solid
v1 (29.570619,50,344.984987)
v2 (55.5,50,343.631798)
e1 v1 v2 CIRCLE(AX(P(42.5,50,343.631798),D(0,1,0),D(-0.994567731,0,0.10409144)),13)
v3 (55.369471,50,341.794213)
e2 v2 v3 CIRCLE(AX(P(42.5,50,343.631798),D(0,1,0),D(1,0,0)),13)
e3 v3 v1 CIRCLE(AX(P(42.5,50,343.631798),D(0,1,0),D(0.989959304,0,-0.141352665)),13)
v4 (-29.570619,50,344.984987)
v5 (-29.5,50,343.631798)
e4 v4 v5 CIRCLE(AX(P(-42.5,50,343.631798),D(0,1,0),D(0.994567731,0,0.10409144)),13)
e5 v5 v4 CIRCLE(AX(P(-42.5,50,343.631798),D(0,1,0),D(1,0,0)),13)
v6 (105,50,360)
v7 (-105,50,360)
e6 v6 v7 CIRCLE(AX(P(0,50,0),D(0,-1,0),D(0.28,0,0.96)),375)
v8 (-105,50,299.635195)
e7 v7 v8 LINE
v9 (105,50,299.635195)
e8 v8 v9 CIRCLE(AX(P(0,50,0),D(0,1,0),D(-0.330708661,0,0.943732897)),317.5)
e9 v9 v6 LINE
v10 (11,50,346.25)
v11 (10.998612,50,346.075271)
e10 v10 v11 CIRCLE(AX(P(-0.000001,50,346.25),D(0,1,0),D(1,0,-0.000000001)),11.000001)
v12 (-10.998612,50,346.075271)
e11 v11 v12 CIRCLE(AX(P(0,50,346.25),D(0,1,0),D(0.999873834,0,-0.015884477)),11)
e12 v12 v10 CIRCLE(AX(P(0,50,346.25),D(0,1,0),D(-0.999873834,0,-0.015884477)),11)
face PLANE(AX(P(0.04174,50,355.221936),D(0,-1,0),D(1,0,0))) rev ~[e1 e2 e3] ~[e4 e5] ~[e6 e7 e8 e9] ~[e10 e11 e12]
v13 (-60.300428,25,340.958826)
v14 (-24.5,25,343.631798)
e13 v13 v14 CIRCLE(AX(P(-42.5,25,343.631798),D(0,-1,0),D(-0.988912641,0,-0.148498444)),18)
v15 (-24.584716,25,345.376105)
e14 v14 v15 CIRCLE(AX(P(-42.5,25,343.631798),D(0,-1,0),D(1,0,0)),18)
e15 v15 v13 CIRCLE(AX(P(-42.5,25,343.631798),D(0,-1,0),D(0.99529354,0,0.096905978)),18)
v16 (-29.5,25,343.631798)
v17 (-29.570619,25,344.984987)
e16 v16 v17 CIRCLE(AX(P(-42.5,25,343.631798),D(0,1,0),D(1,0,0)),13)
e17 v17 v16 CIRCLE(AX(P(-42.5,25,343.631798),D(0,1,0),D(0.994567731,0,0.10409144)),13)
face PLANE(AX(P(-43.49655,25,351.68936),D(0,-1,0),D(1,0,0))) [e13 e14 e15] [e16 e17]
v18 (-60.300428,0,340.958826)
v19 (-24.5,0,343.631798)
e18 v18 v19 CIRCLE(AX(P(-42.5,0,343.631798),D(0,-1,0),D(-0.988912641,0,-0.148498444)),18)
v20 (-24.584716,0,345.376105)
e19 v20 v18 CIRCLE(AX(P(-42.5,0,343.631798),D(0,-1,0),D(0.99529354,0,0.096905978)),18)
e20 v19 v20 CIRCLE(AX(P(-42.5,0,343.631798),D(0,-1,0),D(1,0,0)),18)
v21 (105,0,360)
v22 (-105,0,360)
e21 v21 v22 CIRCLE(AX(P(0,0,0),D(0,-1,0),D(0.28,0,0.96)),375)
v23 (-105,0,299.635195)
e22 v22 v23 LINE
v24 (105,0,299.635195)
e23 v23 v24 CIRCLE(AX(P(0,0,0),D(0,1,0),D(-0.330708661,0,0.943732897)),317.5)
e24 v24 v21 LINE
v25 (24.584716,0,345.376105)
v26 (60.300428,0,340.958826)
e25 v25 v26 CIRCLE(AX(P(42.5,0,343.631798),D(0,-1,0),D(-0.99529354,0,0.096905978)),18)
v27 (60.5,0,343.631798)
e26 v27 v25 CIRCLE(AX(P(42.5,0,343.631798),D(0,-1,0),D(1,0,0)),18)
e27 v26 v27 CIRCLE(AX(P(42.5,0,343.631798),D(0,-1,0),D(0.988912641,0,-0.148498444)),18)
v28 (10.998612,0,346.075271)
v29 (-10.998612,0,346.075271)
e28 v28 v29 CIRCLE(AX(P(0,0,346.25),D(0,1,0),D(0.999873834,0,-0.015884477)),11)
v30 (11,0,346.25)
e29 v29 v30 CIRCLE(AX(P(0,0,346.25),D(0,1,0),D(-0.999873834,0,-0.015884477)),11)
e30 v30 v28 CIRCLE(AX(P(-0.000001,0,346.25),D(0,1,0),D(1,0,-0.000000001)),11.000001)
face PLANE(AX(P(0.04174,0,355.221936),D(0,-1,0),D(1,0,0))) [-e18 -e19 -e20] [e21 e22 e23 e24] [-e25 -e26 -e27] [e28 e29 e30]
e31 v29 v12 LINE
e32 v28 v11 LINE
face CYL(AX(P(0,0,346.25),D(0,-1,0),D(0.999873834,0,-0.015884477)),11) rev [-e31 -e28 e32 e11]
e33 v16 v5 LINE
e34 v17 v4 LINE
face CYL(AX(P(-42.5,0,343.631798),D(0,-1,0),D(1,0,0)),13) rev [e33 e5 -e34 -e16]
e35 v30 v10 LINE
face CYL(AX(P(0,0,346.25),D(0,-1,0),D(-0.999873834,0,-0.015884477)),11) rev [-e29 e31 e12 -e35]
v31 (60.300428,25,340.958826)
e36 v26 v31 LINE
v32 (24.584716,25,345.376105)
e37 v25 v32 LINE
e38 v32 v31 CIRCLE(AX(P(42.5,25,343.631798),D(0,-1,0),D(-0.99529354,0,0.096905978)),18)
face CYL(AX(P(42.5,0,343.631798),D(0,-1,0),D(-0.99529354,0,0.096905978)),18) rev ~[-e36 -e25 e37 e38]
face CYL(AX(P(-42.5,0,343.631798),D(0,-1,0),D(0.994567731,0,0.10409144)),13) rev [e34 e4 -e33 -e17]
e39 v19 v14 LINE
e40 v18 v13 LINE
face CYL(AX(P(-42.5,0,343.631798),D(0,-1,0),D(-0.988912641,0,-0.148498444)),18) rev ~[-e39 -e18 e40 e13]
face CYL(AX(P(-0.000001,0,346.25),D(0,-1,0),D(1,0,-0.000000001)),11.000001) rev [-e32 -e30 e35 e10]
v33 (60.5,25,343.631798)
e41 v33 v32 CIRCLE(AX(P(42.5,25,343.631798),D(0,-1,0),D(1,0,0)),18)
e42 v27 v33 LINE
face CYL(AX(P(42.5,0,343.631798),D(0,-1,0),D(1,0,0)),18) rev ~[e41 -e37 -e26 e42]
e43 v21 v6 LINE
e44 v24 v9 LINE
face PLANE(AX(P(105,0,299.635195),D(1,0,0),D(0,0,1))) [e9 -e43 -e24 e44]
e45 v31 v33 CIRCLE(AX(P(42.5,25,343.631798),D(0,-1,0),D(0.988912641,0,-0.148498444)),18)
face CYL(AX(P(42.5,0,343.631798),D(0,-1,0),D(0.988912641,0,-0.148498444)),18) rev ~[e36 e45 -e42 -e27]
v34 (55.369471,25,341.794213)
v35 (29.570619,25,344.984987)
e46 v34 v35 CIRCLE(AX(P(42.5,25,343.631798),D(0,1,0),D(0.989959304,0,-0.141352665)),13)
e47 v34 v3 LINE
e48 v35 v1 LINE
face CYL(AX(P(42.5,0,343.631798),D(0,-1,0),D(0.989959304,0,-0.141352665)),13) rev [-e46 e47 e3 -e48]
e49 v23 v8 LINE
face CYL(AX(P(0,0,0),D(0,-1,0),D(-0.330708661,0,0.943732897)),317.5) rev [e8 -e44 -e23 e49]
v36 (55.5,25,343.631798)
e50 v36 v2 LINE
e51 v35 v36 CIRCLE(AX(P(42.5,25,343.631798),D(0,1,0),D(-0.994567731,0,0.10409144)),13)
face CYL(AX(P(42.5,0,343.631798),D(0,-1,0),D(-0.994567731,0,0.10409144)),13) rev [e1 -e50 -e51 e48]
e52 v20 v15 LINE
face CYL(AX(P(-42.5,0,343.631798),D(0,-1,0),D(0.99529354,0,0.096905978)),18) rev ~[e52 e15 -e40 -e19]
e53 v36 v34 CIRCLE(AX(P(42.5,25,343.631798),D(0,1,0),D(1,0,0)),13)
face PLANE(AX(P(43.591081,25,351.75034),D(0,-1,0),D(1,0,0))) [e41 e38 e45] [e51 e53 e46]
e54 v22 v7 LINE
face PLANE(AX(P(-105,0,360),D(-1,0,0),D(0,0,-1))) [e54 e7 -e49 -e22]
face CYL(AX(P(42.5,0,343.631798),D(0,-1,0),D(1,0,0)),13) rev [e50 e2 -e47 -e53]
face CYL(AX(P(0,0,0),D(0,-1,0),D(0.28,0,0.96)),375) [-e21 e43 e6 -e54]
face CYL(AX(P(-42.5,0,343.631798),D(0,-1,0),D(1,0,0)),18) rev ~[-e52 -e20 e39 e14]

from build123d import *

# Parameters (mm, degrees)
F1_DEPTH = 50
F2_DEPTH = 25


with BuildPart() as f1:
    # F0 (on Front) → F1 (new body)
    with BuildSketch(Plane.XZ):
        with BuildLine():
            ThreePointArc((60.3004275437, 340.9588258691), (82.833452945, 336.1958976151), (105, 329.9455447494))
            Line((105, 329.9455447494), (105, 360))
            ThreePointArc((105, 360), (0, 375), (-105, 360))
            Line((-105, 360), (-105, 329.9455447494))
            ThreePointArc((-105, 329.9455447494), (-82.833452945, 336.1958976151), (-60.3004275437, 340.9588258691))
            ThreePointArc((-60.3004275437, 340.9588258691), (-44.7093862816, 361.4956891559), (-24.5847162741, 345.3761054643))
            ThreePointArc((-24.5847162741, 345.3761054643), (-17.7950983093, 345.7924189108), (-10.9986121712, 346.0752707581))
            ThreePointArc((-10.9986121712, 346.0752707581), (-0.0873673767, 357.2496530373), (11, 346.25))
            ThreePointArc((11, 346.25), (10.9996530373, 346.1626326233), (10.9986121712, 346.0752707581))
            ThreePointArc((10.9986121712, 346.0752707581), (17.7950983093, 345.7924189108), (24.5847162741, 345.3761054643))
            ThreePointArc((24.5847162741, 345.3761054643), (43.3731818064, 361.6106063163), (60.5, 343.6317978593))
            ThreePointArc((60.5, 343.6317978593), (60.4500375457, 342.2915918653), (60.3004275437, 340.9588258691))
        make_face()
        with BuildLine():
            ThreePointArc((-105, 299.635194862), (0, 317.5), (105, 299.635194862))
            Line((105, 299.635194862), (105, 329.9455447494))
            ThreePointArc((105, 329.9455447494), (82.833452945, 336.1958976151), (60.3004275437, 340.9588258691))
            ThreePointArc((60.3004275437, 340.9588258691), (40.2906137184, 325.7679065626), (24.5847162741, 345.3761054643))
            ThreePointArc((24.5847162741, 345.3761054643), (17.7950983093, 345.7924189108), (10.9986121712, 346.0752707581))
            ThreePointArc((10.9986121712, 346.0752707581), (0, 335.25), (-10.9986121712, 346.0752707581))
            ThreePointArc((-10.9986121712, 346.0752707581), (-17.7950983093, 345.7924189108), (-24.5847162741, 345.3761054643))
            ThreePointArc((-24.5847162741, 345.3761054643), (-24.521191543, 344.5049796657), (-24.5, 343.6317978593))
            ThreePointArc((-24.5, 343.6317978593), (-41.159794006, 325.6817603135), (-60.3004275437, 340.9588258691))
            ThreePointArc((-60.3004275437, 340.9588258691), (-82.833452945, 336.1958976151), (-105, 329.9455447494))
            Line((-105, 329.9455447494), (-105, 299.635194862))
        make_face()
        with BuildLine():
            ThreePointArc((-24.5847162741, 345.3761054643), (-44.7093862816, 361.4956891559), (-60.3004275437, 340.9588258691))
            ThreePointArc((-60.3004275437, 340.9588258691), (-57.8364575566, 341.3854224733), (-55.3694709553, 341.7942132133))
            ThreePointArc((-55.3694709553, 341.7942132133), (-44.09566787, 356.5334971291), (-29.5706194929, 344.9849865759))
            ThreePointArc((-29.5706194929, 344.9849865759), (-27.0783740558, 345.1895481594), (-24.5847162741, 345.3761054643))
        make_face()
        with BuildLine():
            ThreePointArc((-55.3694709553, 341.7942132133), (-57.8364575566, 341.3854224733), (-60.3004275437, 340.9588258691))
            ThreePointArc((-60.3004275437, 340.9588258691), (-41.159794006, 325.6817603135), (-24.5, 343.6317978593))
            ThreePointArc((-24.5, 343.6317978593), (-24.521191543, 344.5049796657), (-24.5847162741, 345.3761054643))
            ThreePointArc((-24.5847162741, 345.3761054643), (-27.0783740558, 345.1895481594), (-29.5706194929, 344.9849865759))
            ThreePointArc((-29.5706194929, 344.9849865759), (-29.5176668778, 344.3093129543), (-29.5, 343.6317978593))
            ThreePointArc((-29.5, 343.6317978593), (-41.5788926281, 330.6644711799), (-55.3694709553, 341.7942132133))
        make_face()
        with BuildLine():
            ThreePointArc((55.3694709553, 341.7942132133), (57.8364575566, 341.3854224733), (60.3004275437, 340.9588258691))
            ThreePointArc((60.3004275437, 340.9588258691), (60.4500375457, 342.2915918653), (60.5, 343.6317978593))
            ThreePointArc((60.5, 343.6317978593), (43.3731818064, 361.6106063163), (24.5847162741, 345.3761054643))
            ThreePointArc((24.5847162741, 345.3761054643), (27.0783740558, 345.1895481594), (29.5706194929, 344.9849865759))
            ThreePointArc((29.5706194929, 344.9849865759), (43.177515095, 356.6141309815), (55.5, 343.6317978593))
            ThreePointArc((55.5, 343.6317978593), (55.4673266794, 342.7106904874), (55.3694709553, 341.7942132133))
        make_face()
        with BuildLine():
            ThreePointArc((24.5847162741, 345.3761054643), (40.2906137184, 325.7679065626), (60.3004275437, 340.9588258691))
            ThreePointArc((60.3004275437, 340.9588258691), (57.8364575566, 341.3854224733), (55.3694709553, 341.7942132133))
            ThreePointArc((55.3694709553, 341.7942132133), (40.90433213, 330.7300985895), (29.5706194929, 344.9849865759))
            ThreePointArc((29.5706194929, 344.9849865759), (27.0783740558, 345.1895481594), (24.5847162741, 345.3761054643))
        make_face()
    extrude(amount=-F1_DEPTH)

    # F0 (on Front) → F2 (cut)
    with BuildSketch(Plane.XZ):
        with BuildLine():
            ThreePointArc((-24.5847162741, 345.3761054643), (-44.7093862816, 361.4956891559), (-60.3004275437, 340.9588258691))
            ThreePointArc((-60.3004275437, 340.9588258691), (-57.8364575566, 341.3854224733), (-55.3694709553, 341.7942132133))
            ThreePointArc((-55.3694709553, 341.7942132133), (-44.09566787, 356.5334971291), (-29.5706194929, 344.9849865759))
            ThreePointArc((-29.5706194929, 344.9849865759), (-27.0783740558, 345.1895481594), (-24.5847162741, 345.3761054643))
        make_face()
        with BuildLine():
            ThreePointArc((-55.3694709553, 341.7942132133), (-57.8364575566, 341.3854224733), (-60.3004275437, 340.9588258691))
            ThreePointArc((-60.3004275437, 340.9588258691), (-41.159794006, 325.6817603135), (-24.5, 343.6317978593))
            ThreePointArc((-24.5, 343.6317978593), (-24.521191543, 344.5049796657), (-24.5847162741, 345.3761054643))
            ThreePointArc((-24.5847162741, 345.3761054643), (-27.0783740558, 345.1895481594), (-29.5706194929, 344.9849865759))
            ThreePointArc((-29.5706194929, 344.9849865759), (-29.5176668778, 344.3093129543), (-29.5, 343.6317978593))
            ThreePointArc((-29.5, 343.6317978593), (-41.5788926281, 330.6644711799), (-55.3694709553, 341.7942132133))
        make_face()
        with BuildLine():
            ThreePointArc((55.3694709553, 341.7942132133), (57.8364575566, 341.3854224733), (60.3004275437, 340.9588258691))
            ThreePointArc((60.3004275437, 340.9588258691), (60.4500375457, 342.2915918653), (60.5, 343.6317978593))
            ThreePointArc((60.5, 343.6317978593), (43.3731818064, 361.6106063163), (24.5847162741, 345.3761054643))
            ThreePointArc((24.5847162741, 345.3761054643), (27.0783740558, 345.1895481594), (29.5706194929, 344.9849865759))
            ThreePointArc((29.5706194929, 344.9849865759), (43.177515095, 356.6141309815), (55.5, 343.6317978593))
            ThreePointArc((55.5, 343.6317978593), (55.4673266794, 342.7106904874), (55.3694709553, 341.7942132133))
        make_face()
        with BuildLine():
            ThreePointArc((24.5847162741, 345.3761054643), (40.2906137184, 325.7679065626), (60.3004275437, 340.9588258691))
            ThreePointArc((60.3004275437, 340.9588258691), (57.8364575566, 341.3854224733), (55.3694709553, 341.7942132133))
            ThreePointArc((55.3694709553, 341.7942132133), (40.90433213, 330.7300985895), (29.5706194929, 344.9849865759))
            ThreePointArc((29.5706194929, 344.9849865759), (27.0783740558, 345.1895481594), (24.5847162741, 345.3761054643))
        make_face()
    extrude(amount=-F2_DEPTH, mode=Mode.SUBTRACT)


solid = f1.part
